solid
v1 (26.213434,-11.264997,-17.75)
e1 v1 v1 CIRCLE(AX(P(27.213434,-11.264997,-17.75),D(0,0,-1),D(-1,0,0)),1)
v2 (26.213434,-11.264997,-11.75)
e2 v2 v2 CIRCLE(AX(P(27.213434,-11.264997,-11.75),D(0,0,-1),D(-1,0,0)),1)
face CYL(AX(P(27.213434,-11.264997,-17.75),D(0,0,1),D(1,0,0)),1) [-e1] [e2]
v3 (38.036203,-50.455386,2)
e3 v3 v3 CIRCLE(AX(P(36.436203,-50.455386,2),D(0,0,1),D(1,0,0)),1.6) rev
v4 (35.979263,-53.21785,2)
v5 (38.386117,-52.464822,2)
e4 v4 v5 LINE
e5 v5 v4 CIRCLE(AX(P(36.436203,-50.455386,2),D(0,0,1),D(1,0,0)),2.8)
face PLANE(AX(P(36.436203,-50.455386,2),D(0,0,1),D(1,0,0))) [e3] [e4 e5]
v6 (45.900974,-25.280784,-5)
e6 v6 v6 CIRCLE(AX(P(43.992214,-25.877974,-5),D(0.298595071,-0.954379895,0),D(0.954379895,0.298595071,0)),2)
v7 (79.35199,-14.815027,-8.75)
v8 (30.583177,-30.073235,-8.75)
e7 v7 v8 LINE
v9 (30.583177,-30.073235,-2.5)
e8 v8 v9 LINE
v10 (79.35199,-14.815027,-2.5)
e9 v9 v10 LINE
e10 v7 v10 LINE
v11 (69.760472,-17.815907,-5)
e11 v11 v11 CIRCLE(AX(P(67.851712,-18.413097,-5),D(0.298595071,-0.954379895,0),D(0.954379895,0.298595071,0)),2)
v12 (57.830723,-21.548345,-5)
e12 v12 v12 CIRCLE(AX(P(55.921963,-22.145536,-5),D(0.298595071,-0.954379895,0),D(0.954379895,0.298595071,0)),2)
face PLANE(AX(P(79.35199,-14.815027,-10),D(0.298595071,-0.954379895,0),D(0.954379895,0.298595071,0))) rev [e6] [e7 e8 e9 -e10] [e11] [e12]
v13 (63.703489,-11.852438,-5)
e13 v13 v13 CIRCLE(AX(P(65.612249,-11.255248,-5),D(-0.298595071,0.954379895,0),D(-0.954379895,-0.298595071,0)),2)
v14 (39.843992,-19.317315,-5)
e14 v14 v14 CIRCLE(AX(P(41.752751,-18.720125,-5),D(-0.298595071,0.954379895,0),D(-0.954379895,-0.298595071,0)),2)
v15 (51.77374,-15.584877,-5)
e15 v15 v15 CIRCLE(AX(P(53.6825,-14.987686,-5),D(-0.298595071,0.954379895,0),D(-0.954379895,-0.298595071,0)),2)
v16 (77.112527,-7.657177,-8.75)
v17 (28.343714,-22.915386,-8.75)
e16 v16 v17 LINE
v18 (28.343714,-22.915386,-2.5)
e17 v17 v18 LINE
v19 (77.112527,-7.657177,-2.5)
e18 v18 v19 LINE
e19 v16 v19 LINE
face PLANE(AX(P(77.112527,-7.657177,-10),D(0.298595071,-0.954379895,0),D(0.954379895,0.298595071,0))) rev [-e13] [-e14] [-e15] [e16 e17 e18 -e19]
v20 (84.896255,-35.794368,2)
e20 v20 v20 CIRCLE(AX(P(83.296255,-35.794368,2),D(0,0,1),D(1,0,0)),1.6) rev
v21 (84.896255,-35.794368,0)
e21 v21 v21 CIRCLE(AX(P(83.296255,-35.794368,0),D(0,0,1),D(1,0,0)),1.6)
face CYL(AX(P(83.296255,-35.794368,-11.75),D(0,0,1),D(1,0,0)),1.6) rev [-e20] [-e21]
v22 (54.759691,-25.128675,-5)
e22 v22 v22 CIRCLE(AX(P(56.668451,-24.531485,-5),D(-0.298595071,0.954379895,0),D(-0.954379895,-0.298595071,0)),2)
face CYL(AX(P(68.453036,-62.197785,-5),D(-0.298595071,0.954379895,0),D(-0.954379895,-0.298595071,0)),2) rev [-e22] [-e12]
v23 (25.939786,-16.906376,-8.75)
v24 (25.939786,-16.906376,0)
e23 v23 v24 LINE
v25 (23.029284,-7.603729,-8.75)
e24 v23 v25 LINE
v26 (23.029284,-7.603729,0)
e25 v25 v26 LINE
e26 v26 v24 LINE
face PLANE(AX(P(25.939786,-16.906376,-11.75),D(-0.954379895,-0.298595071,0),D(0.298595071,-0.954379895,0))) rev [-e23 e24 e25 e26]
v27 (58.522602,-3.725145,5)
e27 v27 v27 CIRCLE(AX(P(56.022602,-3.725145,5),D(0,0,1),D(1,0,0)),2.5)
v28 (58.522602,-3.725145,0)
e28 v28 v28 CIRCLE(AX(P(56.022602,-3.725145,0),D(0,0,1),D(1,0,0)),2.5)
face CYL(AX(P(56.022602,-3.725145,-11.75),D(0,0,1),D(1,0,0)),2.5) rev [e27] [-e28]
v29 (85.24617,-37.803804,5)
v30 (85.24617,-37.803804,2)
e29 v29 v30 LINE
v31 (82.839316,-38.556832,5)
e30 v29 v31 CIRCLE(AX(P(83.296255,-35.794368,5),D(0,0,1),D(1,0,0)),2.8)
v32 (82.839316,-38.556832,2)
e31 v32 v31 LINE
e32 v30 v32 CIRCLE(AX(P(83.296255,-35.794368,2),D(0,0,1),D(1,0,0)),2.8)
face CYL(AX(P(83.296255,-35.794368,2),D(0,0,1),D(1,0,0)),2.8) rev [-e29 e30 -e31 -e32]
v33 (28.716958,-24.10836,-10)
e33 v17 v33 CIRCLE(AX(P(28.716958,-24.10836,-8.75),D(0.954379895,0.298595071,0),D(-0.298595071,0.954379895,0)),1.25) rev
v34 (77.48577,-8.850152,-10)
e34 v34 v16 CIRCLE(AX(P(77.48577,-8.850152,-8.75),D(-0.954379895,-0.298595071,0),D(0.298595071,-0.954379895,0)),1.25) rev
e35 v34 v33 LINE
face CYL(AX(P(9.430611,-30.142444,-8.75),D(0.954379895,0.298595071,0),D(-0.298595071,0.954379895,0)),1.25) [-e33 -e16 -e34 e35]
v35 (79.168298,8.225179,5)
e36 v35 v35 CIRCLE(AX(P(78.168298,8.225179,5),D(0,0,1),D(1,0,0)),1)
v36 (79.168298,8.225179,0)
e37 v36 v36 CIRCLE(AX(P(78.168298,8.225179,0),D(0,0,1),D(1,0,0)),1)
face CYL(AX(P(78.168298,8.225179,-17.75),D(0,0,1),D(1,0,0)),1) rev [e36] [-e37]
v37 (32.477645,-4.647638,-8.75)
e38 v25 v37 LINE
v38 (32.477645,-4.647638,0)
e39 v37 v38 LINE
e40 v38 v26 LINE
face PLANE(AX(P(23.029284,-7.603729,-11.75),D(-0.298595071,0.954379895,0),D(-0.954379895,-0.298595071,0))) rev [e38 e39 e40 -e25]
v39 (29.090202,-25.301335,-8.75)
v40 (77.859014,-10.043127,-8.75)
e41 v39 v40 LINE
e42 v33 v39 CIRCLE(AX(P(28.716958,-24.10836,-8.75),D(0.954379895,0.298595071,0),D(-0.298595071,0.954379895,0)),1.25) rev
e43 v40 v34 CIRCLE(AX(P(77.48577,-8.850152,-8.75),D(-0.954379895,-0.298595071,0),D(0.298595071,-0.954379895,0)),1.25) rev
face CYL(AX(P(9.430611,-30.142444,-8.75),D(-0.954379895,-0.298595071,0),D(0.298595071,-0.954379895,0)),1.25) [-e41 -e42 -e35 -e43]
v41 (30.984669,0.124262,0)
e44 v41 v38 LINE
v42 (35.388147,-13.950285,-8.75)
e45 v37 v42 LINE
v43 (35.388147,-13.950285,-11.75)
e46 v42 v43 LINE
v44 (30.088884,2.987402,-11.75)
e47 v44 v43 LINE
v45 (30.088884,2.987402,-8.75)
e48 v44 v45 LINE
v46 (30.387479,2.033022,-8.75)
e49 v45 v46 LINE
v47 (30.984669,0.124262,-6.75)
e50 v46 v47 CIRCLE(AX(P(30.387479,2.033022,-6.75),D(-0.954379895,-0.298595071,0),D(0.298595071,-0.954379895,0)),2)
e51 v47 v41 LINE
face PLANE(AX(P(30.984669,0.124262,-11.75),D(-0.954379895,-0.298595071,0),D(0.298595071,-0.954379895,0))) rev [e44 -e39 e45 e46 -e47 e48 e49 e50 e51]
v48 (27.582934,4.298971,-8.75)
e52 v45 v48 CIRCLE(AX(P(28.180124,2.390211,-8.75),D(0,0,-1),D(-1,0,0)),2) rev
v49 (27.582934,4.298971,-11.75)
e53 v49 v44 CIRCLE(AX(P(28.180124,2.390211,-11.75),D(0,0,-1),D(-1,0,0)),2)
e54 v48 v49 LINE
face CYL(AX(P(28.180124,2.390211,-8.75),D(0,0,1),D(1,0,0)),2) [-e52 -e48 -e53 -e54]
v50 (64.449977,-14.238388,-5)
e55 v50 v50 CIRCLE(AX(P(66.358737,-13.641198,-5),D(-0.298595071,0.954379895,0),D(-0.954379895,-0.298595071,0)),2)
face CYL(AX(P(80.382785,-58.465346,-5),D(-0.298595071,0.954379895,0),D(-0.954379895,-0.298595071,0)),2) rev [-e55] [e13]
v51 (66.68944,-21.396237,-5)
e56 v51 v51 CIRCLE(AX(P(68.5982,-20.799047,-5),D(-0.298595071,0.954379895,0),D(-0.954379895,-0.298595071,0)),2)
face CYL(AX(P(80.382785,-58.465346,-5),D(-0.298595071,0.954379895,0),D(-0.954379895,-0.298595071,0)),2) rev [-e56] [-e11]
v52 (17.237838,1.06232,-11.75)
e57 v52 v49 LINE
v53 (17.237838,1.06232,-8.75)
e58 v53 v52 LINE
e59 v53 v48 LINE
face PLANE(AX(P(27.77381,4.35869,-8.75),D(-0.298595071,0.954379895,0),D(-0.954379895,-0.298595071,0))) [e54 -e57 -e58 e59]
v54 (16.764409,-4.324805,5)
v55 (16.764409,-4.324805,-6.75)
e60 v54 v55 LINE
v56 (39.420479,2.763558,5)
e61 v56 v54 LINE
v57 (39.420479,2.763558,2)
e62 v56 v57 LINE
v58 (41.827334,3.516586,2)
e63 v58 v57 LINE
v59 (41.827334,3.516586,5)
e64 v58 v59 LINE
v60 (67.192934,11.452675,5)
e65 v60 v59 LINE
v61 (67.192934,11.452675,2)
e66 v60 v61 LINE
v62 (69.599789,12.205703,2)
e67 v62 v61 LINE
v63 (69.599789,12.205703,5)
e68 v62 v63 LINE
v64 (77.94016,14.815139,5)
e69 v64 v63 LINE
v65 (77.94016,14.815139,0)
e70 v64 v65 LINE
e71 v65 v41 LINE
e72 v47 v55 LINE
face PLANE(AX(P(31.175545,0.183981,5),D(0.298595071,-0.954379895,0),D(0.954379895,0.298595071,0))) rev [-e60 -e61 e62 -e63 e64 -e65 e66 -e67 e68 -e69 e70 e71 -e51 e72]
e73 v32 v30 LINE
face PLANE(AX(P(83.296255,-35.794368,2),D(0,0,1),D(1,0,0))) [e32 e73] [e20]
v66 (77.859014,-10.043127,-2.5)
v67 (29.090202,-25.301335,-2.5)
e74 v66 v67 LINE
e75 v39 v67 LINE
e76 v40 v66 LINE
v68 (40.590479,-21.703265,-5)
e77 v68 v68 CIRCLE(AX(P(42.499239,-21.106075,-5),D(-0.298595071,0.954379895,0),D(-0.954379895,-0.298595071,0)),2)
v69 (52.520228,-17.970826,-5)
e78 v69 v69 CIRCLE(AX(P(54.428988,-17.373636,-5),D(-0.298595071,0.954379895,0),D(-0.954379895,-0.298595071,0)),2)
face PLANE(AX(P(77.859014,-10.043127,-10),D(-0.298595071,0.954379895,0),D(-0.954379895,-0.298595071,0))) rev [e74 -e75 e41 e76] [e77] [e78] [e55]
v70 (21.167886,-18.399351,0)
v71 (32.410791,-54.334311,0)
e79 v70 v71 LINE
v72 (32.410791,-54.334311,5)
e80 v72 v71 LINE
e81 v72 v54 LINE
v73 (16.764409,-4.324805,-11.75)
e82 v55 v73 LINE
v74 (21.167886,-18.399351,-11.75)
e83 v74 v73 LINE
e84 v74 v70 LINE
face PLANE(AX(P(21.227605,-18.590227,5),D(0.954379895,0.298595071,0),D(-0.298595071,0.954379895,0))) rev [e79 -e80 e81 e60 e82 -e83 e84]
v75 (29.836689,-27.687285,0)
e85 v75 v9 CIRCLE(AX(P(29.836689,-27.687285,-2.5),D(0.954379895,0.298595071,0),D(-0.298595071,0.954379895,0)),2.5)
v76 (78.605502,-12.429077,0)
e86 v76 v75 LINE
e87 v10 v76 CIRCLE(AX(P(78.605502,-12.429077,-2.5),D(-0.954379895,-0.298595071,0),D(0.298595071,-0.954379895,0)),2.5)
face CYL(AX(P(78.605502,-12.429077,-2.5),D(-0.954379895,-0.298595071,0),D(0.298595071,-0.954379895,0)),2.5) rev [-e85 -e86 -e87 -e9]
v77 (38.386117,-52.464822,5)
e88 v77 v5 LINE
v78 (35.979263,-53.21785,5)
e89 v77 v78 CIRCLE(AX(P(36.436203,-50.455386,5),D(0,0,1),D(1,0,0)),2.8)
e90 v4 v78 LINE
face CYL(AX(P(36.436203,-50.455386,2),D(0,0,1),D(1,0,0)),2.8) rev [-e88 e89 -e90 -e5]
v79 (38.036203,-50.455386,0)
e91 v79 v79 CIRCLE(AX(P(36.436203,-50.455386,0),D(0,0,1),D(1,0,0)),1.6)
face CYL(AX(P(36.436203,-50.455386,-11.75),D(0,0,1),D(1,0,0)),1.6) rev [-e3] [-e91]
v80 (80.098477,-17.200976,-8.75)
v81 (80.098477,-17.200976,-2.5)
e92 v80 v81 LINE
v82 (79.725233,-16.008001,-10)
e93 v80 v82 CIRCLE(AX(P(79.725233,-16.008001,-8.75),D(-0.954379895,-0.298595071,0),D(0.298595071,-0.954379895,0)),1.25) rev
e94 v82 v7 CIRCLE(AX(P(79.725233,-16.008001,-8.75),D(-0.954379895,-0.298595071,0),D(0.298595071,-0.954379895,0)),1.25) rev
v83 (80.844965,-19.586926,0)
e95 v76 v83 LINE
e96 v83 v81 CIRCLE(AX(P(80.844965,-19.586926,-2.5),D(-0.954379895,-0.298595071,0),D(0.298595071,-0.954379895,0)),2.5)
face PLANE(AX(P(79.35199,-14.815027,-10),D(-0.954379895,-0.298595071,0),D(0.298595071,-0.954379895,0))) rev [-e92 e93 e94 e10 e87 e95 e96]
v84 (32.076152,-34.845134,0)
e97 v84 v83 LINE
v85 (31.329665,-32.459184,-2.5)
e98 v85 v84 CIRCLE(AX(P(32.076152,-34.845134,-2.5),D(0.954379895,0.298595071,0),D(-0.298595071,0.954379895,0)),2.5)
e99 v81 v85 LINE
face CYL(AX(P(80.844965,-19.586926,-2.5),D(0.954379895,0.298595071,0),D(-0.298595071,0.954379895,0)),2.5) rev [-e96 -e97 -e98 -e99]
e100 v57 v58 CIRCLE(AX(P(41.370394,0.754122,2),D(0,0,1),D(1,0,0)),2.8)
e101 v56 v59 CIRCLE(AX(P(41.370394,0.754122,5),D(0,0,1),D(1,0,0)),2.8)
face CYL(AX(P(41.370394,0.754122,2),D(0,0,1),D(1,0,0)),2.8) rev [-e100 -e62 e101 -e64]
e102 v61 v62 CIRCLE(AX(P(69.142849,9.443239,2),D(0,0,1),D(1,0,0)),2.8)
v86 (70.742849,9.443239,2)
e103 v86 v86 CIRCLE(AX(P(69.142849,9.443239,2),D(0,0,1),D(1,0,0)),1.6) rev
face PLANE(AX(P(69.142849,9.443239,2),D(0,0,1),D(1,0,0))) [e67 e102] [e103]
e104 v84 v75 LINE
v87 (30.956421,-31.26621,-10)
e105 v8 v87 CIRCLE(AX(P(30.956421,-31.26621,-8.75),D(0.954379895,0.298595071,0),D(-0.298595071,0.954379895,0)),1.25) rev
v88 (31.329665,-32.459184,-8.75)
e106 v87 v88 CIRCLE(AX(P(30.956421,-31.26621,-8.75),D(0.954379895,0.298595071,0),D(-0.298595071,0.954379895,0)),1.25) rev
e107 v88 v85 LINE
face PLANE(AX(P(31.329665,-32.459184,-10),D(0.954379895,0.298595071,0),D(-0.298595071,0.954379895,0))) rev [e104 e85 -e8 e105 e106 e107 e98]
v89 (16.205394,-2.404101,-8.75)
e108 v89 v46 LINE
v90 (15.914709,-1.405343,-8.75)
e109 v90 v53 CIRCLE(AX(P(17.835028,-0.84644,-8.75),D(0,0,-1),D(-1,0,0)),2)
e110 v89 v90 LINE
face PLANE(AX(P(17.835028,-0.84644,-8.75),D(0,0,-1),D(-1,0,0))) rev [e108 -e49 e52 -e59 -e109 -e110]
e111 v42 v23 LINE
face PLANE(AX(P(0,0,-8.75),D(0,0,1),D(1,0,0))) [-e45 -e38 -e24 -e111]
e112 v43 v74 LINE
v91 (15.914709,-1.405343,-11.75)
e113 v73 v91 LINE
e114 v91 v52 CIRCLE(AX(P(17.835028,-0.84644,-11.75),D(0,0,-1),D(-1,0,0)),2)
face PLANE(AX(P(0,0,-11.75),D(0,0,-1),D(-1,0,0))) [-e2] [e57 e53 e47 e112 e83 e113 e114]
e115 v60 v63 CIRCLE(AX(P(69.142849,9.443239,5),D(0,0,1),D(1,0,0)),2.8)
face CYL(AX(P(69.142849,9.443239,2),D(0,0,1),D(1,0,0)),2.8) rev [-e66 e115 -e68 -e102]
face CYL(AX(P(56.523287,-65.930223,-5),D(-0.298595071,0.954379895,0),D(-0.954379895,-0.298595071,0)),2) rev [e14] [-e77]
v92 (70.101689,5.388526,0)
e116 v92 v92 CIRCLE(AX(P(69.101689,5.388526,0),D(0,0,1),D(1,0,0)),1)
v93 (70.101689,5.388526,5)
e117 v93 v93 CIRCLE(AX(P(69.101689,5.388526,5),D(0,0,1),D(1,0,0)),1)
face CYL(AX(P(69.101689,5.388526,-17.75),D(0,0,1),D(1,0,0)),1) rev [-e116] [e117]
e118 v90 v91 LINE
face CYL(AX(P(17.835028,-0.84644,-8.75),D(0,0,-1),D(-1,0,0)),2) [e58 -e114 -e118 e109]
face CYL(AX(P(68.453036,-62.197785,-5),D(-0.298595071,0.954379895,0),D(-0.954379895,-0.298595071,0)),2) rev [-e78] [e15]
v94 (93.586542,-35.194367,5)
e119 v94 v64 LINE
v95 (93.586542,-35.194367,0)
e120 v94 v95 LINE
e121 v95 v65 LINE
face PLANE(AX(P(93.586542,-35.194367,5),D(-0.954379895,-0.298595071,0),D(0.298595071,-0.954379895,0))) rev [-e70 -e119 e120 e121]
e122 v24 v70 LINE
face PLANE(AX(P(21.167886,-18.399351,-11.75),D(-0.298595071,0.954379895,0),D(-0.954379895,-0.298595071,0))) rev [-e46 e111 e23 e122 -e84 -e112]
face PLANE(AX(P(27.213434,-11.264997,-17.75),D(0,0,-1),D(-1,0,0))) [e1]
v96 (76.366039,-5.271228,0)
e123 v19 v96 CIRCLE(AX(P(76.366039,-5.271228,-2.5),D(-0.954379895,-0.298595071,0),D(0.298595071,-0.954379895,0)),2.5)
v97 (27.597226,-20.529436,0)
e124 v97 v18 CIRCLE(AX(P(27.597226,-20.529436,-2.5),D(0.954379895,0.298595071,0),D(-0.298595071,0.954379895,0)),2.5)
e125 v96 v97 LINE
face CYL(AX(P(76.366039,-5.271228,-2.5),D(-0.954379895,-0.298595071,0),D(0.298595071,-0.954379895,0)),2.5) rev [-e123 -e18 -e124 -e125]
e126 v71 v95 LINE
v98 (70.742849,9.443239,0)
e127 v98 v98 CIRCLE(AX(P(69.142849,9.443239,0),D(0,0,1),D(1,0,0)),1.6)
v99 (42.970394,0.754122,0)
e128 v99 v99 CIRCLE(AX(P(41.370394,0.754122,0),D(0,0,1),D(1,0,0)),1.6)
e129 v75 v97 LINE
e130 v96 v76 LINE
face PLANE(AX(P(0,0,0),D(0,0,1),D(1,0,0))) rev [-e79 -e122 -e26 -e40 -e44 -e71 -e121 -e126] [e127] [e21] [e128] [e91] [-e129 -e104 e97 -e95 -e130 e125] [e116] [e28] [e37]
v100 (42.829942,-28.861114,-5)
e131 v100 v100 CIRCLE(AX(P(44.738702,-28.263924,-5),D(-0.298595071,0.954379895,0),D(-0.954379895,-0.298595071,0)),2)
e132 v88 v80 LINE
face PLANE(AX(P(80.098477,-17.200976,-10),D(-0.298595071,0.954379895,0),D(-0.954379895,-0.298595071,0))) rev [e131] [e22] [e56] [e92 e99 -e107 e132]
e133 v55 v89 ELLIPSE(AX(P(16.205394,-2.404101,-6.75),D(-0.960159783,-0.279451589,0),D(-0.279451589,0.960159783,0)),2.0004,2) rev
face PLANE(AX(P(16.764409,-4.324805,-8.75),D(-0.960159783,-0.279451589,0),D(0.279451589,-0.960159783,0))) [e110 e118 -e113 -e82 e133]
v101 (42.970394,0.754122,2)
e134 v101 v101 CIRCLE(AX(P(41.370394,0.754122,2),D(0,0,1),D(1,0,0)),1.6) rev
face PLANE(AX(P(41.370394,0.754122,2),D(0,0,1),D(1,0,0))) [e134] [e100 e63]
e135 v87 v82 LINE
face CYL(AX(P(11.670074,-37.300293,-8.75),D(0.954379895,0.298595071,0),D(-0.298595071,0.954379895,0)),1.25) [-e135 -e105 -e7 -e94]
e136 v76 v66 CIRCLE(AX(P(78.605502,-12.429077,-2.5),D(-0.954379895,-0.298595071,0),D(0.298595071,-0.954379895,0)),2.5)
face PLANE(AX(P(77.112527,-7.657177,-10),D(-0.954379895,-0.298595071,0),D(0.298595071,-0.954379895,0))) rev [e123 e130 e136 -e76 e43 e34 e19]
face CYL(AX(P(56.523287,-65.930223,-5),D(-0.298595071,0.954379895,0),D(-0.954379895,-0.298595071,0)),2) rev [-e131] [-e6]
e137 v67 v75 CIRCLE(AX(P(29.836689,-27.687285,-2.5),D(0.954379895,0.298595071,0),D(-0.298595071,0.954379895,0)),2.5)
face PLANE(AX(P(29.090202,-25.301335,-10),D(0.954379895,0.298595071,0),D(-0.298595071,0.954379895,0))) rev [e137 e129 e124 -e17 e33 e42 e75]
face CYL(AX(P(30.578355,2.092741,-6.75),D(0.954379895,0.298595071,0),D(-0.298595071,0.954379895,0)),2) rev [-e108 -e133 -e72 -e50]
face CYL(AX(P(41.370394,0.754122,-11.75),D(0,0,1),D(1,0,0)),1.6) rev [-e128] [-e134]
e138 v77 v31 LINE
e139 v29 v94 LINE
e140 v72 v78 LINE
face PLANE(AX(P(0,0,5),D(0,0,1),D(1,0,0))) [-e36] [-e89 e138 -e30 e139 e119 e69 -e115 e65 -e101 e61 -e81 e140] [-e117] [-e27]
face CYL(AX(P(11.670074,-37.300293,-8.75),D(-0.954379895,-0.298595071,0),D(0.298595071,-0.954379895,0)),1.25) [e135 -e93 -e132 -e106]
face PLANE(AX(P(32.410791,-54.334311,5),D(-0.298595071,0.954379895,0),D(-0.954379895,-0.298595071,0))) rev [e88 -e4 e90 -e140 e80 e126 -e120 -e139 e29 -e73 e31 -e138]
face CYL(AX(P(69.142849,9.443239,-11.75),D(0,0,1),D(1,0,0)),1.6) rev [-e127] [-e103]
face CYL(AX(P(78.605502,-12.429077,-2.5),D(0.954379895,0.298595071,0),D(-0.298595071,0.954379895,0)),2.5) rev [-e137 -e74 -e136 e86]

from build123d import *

# Parameters (mm, degrees)
BOSS_EXTRUDE1_DEPTH    = 5
BOSS_EXTRUDE3_DEPTH    = 11.75
BOSS_EXTRUDE5_DEPTH    = 3
FILLET1_R              = 2
BOSS_EXTRUDE6_DEPTH    = 10
SKETCH7_R              = 2
CUT_EXTRUDE1_DEPTH     = 96.909253568
BOSS_EXTRUDE8_DEPTH    = 3
FILLET4_R              = 2.5
FILLET5_R              = 1.25
CUT_EXTRUDE2_OUTLINE_R = 1.6
CUT_EXTRUDE2_DEPTH     = 5
SKETCH10_R             = 2.5
CUT_EXTRUDE3_DEPTH     = 110.504432364
SKETCH4_R              = 1
BOSS_EXTRUDE4_DEPTH    = 6
SKETCH12_R             = 2.8
CUT_EXTRUDE4_DEPTH     = 3
SKETCH9_R              = 1
CUT_EXTRUDE5_DEPTH     = 111.58128552


# Read off the part's stored shape, not the designer's step: Cut-Extrude2
# Some blends are built 0.0001 mm under size
with BuildPart() as part:
    # Sketch1 → Boss-Extrude1 (new body)
    with BuildSketch(Plane.XY):
        Polygon((21.227605409, -18.590227349), (16.764409011, -4.324804639), (31.175545422, 0.183980935), (77.940160264, 14.815139421), (93.586541992, -35.194367063), (32.410790739, -54.334311124), align=None)
    extrude(amount=BOSS_EXTRUDE1_DEPTH)

    # Sketch3 → Boss-Extrude3 (add)
    with BuildSketch(Plane(origin=(0, 0, 0), x_dir=(-1, 0, 0), z_dir=(0, 0, -1))):
        Polygon((-30.984669443, 0.124261921), (-32.477644799, -4.647637553), (-23.029283841, -7.603728757), (-25.939785869, -16.906376014), (-21.167886395, -18.39935137), (-16.764409011, -4.324804639), align=None)
    extrude(amount=BOSS_EXTRUDE3_DEPTH)

    # Sketch5 → Boss-Extrude5 (add)
    with BuildSketch(Plane(origin=(0, 0, -11.75), x_dir=(-1, 0, 0), z_dir=(0, 0, -1))):
        with BuildLine():
            Line((-30.984669443, 0.124261921), (-29.491694087, 4.896161395))
            Line((-29.491694087, 4.896161395), (-27.773810277, 4.358690267))
            Line((-27.773810277, 4.358690267), (-17.237837952, 1.062320107))
            ThreePointArc((-17.237837952, 1.062320107), (-16.072415286, 0.098650836), (-15.914708528, -1.405342859))
            Line((-15.914708528, -1.405342859), (-16.764409011, -4.324804639))
            Line((-16.764409011, -4.324804639), (-30.984669443, 0.124261921))
        make_face()
    extrude(amount=-BOSS_EXTRUDE5_DEPTH)

    # Fillet1
    fillet1_edges = [part.edges().sort_by_distance(p)[0] for p in [
        (23.874539227, -2.100271359, -8.75),
        (29.491694087, 4.896161395, -10.25),
    ]]
    fillet(fillet1_edges, radius=FILLET1_R)

    # Sketch6 → Boss-Extrude6 (add)
    with BuildSketch(Plane(origin=(0, 0, 0), x_dir=(-1, 0, 0), z_dir=(0, 0, -1))):
        Polygon((-77.85901424, -10.043127118), (-29.090201618, -25.301335253), (-28.34371394, -22.915385516), (-77.112526562, -7.657177381), align=None)
        Polygon((-79.351989595, -14.815026591), (-80.098477273, -17.200976328), (-31.329664652, -32.459184464), (-30.583176974, -30.073234727), align=None)
    extrude(amount=BOSS_EXTRUDE6_DEPTH)

    # Sketch7 → Cut-Extrude1 (cut, through all)
    with BuildSketch(Plane(origin=(9.057366854, -28.949469231, 0), x_dir=(0.9543798947428422, 0.29859507114257827, 0), z_dir=(-0.2985950711425783, 0.9543798947428423, 0))):
        with Locations(Location((46.758249559, 5, 0), (0, 0, 180))):
            Circle(SKETCH7_R)
        with Locations(Location((59.258249559, 5, 0), (0, 0, 180))):
            Circle(SKETCH7_R)
        with Locations(Location((34.258249559, 5, 0), (0, 0, 180))):
            Circle(SKETCH7_R)
    extrude(amount=-CUT_EXTRUDE1_DEPTH, mode=Mode.SUBTRACT)

    # Sketch11 → Boss-Extrude8 (add)
    with BuildSketch(Plane(origin=(0, 0, -11.75), x_dir=(-1, 0, 0), z_dir=(0, 0, -1))):
        Polygon((-32.477644799, -4.647637553), (-34.866405368, -12.282676711), (-35.388146827, -13.95028481), (-25.939785869, -16.906376014), (-23.029283841, -7.603728757), align=None)
    extrude(amount=-BOSS_EXTRUDE8_DEPTH)

    # Fillet4
    fillet4_edges = [part.edges().sort_by_distance(p)[0] for p in [
        (52.728120251, -15.286281449, 0),
        (53.474607929, -17.672231185, 0),
        (54.967583285, -22.444130659, 0),
        (55.714070963, -24.830080396, 0),
    ]]
    fillet(fillet4_edges, radius=FILLET4_R - 0.0001)  # a hair under: the kernel refuses the full size

    # Fillet5
    # the kernel refuses this fillet: 1.25 mm, written as the material it takes off along each edge
    with BuildSketch(Plane(origin=(83.080914444, -16.267866731, -10), x_dir=(0, 0, 1), z_dir=(-0.9543798947428422, -0.2985950711425782, 0)), Plane(origin=(27.600739803, -31.006344324, -10), x_dir=(0, 0, 1), z_dir=(0.9543798947428423, 0.2985950711425782, 0)), Plane(origin=(25.361276769, -23.848495114, -10), x_dir=(0, 0, 1), z_dir=(0.9543798947428422, 0.2985950711425783, 0)), Plane(origin=(80.841451411, -9.11001752, -10), x_dir=(0, 0, 1), z_dir=(-0.9543798947428422, -0.2985950711425783, 0))) as fillet5_piece_1:
        with BuildLine():
            CenterArc((FILLET5_R, FILLET5_R), FILLET5_R, 180, 90)
            Line((0, FILLET5_R), (0, 0))
            Line((0, 0), (FILLET5_R, 0))
        make_face()
    extrude(amount=57.35, mode=Mode.SUBTRACT)

    # Cut-Extrude2 outline → Cut-Extrude2 (cut)
    with BuildSketch(Plane.XY):
        with Locations((69.142848995, 9.443238973)):
            Circle(CUT_EXTRUDE2_OUTLINE_R)
        with Locations((36.436202535, -50.455386031)):
            Circle(CUT_EXTRUDE2_OUTLINE_R)
        with Locations((41.370394058, 0.754122403)):
            Circle(CUT_EXTRUDE2_OUTLINE_R)
        with Locations((83.296255367, -35.794368038)):
            Circle(CUT_EXTRUDE2_OUTLINE_R)
    extrude(amount=CUT_EXTRUDE2_DEPTH, mode=Mode.SUBTRACT)

    # Sketch10 → Cut-Extrude3 (cut, through all)
    with BuildSketch(Plane.XY.offset(5)):
        with Locations((56.022602403, -3.725145057)):
            Circle(SKETCH10_R)
    extrude(amount=-CUT_EXTRUDE3_DEPTH, mode=Mode.SUBTRACT)

    # Sketch4 → Boss-Extrude4 (add)
    with BuildSketch(Plane(origin=(0, 0, -11.75), x_dir=(-1, 0, 0), z_dir=(0, 0, -1))):
        with Locations((-27.213433721, -11.264996593)):
            Circle(SKETCH4_R)
    extrude(amount=BOSS_EXTRUDE4_DEPTH)

    # Sketch12 → Cut-Extrude4 (cut)
    with BuildSketch(Plane.XY.offset(5)):
        with Locations((69.142848995, 9.443238973)):
            Circle(SKETCH12_R)
        with Locations((41.370394058, 0.754122403)):
            Circle(SKETCH12_R)
        with Locations((36.436202535, -50.455386031)):
            Circle(SKETCH12_R)
        with Locations((83.296255367, -35.794368038)):
            Circle(SKETCH12_R)
    extrude(amount=-CUT_EXTRUDE4_DEPTH, mode=Mode.SUBTRACT)

    # Sketch9 → Cut-Extrude5 (cut, through all)
    with BuildSketch(Plane.XY.offset(5)):
        with Locations((78.168297598, 8.225179053)):
            Circle(SKETCH9_R)
        with Locations((69.101688598, 5.388525877)):
            Circle(SKETCH9_R)
    extrude(amount=-CUT_EXTRUDE5_DEPTH, mode=Mode.SUBTRACT)


solid = part.part
